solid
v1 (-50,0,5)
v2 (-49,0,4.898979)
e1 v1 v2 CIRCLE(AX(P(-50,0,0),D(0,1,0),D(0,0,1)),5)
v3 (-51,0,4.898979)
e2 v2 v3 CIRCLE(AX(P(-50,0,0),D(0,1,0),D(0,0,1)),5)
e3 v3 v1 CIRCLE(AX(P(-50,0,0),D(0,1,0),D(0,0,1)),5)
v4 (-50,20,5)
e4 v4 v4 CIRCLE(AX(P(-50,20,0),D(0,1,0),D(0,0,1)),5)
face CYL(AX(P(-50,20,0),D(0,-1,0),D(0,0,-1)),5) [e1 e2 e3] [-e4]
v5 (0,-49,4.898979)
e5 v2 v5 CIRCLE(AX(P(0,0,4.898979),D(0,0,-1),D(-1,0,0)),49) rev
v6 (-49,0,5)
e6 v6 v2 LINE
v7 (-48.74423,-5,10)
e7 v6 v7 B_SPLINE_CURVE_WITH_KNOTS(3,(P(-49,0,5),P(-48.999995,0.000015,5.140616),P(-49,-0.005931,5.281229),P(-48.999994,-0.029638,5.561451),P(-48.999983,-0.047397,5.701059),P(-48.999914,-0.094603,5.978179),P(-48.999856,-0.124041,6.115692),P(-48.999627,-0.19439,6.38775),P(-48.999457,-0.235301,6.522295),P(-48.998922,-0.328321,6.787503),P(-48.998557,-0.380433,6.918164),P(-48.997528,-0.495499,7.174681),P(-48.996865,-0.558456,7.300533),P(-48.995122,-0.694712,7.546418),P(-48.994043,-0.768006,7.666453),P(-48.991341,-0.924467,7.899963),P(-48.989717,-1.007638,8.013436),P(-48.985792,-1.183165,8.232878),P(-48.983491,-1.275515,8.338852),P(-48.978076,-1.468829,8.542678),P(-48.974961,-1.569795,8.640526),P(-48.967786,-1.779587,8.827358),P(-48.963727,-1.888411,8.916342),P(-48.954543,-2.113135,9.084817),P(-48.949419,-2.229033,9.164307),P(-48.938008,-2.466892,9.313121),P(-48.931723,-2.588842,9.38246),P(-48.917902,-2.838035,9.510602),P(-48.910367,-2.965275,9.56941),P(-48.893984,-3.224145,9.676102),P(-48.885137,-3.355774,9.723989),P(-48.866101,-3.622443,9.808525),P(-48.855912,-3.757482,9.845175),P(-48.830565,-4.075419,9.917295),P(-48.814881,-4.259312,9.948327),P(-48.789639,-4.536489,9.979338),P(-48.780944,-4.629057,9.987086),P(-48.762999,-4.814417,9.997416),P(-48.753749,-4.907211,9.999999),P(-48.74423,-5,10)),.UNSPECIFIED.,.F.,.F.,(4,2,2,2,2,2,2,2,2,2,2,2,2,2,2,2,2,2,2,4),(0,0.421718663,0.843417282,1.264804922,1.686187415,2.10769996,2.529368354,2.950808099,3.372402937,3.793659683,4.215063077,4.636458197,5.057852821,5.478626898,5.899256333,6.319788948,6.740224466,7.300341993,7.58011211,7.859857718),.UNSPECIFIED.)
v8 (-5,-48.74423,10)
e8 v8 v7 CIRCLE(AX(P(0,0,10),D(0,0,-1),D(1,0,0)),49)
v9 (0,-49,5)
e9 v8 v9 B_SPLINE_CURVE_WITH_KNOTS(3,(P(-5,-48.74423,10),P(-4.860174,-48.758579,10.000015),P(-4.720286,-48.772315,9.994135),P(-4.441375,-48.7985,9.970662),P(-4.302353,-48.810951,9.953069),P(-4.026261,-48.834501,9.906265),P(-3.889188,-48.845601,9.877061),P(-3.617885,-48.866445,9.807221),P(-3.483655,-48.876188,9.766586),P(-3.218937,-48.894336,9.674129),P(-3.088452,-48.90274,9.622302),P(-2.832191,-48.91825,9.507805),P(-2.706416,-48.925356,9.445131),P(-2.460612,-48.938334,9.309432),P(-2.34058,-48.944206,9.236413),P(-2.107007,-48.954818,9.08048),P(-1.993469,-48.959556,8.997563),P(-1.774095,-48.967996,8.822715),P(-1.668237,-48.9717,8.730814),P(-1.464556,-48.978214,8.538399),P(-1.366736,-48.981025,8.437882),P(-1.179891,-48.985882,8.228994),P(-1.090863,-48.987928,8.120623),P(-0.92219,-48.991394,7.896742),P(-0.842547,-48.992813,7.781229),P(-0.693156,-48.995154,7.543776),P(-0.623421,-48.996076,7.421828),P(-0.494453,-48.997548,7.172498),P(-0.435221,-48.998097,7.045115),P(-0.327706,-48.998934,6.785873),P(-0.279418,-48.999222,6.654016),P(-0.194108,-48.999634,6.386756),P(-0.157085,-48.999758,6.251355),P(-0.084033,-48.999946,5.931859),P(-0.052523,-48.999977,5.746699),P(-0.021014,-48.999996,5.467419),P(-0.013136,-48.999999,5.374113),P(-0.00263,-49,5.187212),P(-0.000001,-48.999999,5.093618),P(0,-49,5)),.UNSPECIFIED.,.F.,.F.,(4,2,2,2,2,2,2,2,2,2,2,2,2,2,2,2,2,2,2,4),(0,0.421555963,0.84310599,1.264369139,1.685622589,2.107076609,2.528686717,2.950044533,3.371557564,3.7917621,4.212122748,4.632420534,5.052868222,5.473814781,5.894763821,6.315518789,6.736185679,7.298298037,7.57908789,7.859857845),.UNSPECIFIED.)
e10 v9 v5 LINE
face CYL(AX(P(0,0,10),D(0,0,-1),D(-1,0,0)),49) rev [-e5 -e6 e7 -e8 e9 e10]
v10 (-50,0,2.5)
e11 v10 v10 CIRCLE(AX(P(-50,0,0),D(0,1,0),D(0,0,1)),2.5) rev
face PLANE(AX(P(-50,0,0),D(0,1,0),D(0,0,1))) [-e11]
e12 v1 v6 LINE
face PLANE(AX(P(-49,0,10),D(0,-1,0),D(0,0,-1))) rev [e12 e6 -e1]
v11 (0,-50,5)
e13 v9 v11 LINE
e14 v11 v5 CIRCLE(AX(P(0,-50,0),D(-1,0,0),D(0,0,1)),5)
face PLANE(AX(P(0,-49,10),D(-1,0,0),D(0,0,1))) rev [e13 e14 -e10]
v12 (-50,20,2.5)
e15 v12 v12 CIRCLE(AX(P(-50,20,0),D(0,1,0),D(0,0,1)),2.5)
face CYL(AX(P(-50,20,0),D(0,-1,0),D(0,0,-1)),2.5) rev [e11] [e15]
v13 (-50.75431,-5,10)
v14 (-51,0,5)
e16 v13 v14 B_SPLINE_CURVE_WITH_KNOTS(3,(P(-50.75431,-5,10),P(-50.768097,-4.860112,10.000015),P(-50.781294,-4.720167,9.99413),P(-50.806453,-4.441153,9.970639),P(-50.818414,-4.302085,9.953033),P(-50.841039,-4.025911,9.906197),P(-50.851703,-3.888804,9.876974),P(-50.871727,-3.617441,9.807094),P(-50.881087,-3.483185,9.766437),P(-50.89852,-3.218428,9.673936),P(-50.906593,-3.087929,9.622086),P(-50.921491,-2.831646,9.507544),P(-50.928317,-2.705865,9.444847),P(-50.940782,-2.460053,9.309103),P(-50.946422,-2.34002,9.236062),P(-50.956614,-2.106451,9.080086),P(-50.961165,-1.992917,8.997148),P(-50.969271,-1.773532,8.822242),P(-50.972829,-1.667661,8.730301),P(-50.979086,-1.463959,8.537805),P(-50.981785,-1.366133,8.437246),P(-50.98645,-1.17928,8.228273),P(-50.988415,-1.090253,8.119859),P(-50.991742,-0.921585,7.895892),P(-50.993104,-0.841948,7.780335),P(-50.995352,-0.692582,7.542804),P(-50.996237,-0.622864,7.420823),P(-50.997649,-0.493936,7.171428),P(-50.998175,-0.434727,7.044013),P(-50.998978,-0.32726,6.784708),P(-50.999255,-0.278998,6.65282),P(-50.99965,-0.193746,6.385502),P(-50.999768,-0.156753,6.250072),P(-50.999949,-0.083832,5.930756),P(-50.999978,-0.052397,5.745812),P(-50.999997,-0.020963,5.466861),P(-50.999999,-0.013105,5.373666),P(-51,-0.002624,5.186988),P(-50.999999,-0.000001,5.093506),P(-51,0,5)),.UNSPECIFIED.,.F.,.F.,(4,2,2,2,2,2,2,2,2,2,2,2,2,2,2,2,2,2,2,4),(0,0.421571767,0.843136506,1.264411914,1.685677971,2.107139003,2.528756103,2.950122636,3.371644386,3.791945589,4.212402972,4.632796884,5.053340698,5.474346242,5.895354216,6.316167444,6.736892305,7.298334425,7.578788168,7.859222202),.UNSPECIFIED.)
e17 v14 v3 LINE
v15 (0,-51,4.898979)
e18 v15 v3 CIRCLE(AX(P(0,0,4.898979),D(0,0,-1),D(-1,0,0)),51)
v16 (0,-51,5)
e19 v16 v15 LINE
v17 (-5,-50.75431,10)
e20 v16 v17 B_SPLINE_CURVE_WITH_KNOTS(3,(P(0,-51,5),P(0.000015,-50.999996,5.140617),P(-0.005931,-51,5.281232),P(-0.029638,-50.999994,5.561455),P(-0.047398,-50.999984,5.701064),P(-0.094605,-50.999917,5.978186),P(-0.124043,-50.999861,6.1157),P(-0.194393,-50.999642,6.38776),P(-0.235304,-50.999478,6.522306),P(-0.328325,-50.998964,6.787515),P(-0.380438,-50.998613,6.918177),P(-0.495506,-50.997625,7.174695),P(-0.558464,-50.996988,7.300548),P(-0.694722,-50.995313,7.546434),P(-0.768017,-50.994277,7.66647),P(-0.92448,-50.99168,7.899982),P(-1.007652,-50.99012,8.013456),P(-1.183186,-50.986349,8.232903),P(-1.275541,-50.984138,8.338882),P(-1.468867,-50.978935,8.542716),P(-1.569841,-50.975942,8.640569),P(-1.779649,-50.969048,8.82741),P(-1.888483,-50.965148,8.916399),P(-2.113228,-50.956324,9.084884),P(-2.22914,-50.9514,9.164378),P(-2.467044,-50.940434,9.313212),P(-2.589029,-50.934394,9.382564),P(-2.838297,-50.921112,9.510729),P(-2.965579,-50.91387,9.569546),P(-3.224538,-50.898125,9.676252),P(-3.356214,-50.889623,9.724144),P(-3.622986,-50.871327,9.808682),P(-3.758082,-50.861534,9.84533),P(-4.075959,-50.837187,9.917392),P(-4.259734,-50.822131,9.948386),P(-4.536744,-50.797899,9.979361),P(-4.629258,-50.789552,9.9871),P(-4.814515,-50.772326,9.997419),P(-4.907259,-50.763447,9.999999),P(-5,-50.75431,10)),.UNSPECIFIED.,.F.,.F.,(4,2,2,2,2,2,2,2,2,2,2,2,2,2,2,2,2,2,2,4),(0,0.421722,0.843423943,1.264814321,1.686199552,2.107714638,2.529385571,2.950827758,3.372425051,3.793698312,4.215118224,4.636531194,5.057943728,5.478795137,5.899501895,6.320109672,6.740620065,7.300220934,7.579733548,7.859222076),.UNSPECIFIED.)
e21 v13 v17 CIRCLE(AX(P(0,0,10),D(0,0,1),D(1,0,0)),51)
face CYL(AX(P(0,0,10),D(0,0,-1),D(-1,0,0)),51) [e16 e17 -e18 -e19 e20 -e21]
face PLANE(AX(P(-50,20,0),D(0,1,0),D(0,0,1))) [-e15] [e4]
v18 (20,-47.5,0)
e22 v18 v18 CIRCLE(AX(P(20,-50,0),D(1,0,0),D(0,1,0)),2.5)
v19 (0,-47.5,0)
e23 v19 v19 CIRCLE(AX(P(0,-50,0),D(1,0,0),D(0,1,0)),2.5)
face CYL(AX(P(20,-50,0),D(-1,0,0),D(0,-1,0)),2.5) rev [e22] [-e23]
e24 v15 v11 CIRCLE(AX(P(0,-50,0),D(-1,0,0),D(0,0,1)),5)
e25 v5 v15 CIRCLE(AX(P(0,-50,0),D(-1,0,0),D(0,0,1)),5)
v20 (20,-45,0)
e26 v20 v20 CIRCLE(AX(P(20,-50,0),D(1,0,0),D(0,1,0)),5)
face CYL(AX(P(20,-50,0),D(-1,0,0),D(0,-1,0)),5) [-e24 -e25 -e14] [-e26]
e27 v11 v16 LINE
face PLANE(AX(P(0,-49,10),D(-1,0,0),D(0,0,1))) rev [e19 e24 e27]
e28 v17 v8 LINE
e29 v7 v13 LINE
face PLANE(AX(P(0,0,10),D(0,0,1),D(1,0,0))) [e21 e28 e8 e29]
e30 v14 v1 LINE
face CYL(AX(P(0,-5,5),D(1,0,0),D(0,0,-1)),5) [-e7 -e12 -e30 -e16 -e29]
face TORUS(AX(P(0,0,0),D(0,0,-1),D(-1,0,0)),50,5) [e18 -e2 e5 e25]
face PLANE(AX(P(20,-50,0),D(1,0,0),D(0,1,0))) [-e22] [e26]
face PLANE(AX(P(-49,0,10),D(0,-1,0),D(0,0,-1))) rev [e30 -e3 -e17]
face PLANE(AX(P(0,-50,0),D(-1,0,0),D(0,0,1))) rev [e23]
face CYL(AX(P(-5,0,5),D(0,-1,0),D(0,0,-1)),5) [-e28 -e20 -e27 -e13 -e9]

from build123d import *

# Parameters (mm, degrees)
SKETCH_4_R      = 5
REVOLVE_1_ANGLE = 90
SKETCH_5_R      = 5
SKETCH_5_R_2    = 2.5
EXTRUDE_4_DEPTH = 20
SKETCH_6_R      = 5
SKETCH_6_R_2    = 2.5
EXTRUDE_5_DEPTH = 20
EXTRUDE_6_DEPTH = 10
FILLET_1_R      = 5


with BuildPart() as part:
    # 草圖4 → 旋轉1 (revolve)
    with BuildSketch(Plane(origin=(0, 0, 0), x_dir=(1, 0, 0), z_dir=(0, 1, 0))):
        with Locations((-50, 0)):
            Circle(SKETCH_4_R)
    revolve(axis=Axis((0, 0, -3.474942085), (0, 0, 1)), revolution_arc=REVOLVE_1_ANGLE)

    # 草圖5 → 填料-伸長4 (add)
    with BuildSketch(Plane(origin=(0, 0, 0), x_dir=(0, 0, -1), z_dir=(1, 0, 0))):
        with Locations(Location((0, -50, 0), (0, 0, 270))):
            Circle(SKETCH_5_R)
        with Locations(Location((0, -50, 0), (0, 0, 90))):
            Circle(SKETCH_5_R_2, mode=Mode.SUBTRACT)
    extrude(amount=EXTRUDE_4_DEPTH)

    # 草圖6 → 填料-伸長5 (add)
    with BuildSketch(Plane(origin=(0, 0, 0), x_dir=(1, 0, 0), z_dir=(0, 1, 0))):
        with Locations(Location((-50, 0, 0), (0, 0, 180))):
            Circle(SKETCH_6_R)
        with Locations(Location((-50, 0, 0), (0, 0, 270))):
            Circle(SKETCH_6_R_2, mode=Mode.SUBTRACT)
    extrude(amount=EXTRUDE_5_DEPTH)

    # 草圖7 → 填料-伸長6 (add)
    with BuildSketch(Plane.XY):
        with BuildLine():
            Line((-49, 0), (-51, 0))
            ThreePointArc((-51, 0), (-36.062445841, -36.062445841), (0, -51))
            Line((0, -51), (0, -49))
            ThreePointArc((0, -49), (-34.648232278, -34.648232278), (-49, 0))
        make_face()
    extrude(amount=EXTRUDE_6_DEPTH)

    # 圓角1
    fillet_1_edges = [part.edges().sort_by_distance(p)[0] for p in [
        (-50, 0, 10),
        (0, -50, 10),
    ]]
    fillet(fillet_1_edges, radius=FILLET_1_R - 0.0001)  # a hair under: the kernel refuses the full size


solid = part.part
